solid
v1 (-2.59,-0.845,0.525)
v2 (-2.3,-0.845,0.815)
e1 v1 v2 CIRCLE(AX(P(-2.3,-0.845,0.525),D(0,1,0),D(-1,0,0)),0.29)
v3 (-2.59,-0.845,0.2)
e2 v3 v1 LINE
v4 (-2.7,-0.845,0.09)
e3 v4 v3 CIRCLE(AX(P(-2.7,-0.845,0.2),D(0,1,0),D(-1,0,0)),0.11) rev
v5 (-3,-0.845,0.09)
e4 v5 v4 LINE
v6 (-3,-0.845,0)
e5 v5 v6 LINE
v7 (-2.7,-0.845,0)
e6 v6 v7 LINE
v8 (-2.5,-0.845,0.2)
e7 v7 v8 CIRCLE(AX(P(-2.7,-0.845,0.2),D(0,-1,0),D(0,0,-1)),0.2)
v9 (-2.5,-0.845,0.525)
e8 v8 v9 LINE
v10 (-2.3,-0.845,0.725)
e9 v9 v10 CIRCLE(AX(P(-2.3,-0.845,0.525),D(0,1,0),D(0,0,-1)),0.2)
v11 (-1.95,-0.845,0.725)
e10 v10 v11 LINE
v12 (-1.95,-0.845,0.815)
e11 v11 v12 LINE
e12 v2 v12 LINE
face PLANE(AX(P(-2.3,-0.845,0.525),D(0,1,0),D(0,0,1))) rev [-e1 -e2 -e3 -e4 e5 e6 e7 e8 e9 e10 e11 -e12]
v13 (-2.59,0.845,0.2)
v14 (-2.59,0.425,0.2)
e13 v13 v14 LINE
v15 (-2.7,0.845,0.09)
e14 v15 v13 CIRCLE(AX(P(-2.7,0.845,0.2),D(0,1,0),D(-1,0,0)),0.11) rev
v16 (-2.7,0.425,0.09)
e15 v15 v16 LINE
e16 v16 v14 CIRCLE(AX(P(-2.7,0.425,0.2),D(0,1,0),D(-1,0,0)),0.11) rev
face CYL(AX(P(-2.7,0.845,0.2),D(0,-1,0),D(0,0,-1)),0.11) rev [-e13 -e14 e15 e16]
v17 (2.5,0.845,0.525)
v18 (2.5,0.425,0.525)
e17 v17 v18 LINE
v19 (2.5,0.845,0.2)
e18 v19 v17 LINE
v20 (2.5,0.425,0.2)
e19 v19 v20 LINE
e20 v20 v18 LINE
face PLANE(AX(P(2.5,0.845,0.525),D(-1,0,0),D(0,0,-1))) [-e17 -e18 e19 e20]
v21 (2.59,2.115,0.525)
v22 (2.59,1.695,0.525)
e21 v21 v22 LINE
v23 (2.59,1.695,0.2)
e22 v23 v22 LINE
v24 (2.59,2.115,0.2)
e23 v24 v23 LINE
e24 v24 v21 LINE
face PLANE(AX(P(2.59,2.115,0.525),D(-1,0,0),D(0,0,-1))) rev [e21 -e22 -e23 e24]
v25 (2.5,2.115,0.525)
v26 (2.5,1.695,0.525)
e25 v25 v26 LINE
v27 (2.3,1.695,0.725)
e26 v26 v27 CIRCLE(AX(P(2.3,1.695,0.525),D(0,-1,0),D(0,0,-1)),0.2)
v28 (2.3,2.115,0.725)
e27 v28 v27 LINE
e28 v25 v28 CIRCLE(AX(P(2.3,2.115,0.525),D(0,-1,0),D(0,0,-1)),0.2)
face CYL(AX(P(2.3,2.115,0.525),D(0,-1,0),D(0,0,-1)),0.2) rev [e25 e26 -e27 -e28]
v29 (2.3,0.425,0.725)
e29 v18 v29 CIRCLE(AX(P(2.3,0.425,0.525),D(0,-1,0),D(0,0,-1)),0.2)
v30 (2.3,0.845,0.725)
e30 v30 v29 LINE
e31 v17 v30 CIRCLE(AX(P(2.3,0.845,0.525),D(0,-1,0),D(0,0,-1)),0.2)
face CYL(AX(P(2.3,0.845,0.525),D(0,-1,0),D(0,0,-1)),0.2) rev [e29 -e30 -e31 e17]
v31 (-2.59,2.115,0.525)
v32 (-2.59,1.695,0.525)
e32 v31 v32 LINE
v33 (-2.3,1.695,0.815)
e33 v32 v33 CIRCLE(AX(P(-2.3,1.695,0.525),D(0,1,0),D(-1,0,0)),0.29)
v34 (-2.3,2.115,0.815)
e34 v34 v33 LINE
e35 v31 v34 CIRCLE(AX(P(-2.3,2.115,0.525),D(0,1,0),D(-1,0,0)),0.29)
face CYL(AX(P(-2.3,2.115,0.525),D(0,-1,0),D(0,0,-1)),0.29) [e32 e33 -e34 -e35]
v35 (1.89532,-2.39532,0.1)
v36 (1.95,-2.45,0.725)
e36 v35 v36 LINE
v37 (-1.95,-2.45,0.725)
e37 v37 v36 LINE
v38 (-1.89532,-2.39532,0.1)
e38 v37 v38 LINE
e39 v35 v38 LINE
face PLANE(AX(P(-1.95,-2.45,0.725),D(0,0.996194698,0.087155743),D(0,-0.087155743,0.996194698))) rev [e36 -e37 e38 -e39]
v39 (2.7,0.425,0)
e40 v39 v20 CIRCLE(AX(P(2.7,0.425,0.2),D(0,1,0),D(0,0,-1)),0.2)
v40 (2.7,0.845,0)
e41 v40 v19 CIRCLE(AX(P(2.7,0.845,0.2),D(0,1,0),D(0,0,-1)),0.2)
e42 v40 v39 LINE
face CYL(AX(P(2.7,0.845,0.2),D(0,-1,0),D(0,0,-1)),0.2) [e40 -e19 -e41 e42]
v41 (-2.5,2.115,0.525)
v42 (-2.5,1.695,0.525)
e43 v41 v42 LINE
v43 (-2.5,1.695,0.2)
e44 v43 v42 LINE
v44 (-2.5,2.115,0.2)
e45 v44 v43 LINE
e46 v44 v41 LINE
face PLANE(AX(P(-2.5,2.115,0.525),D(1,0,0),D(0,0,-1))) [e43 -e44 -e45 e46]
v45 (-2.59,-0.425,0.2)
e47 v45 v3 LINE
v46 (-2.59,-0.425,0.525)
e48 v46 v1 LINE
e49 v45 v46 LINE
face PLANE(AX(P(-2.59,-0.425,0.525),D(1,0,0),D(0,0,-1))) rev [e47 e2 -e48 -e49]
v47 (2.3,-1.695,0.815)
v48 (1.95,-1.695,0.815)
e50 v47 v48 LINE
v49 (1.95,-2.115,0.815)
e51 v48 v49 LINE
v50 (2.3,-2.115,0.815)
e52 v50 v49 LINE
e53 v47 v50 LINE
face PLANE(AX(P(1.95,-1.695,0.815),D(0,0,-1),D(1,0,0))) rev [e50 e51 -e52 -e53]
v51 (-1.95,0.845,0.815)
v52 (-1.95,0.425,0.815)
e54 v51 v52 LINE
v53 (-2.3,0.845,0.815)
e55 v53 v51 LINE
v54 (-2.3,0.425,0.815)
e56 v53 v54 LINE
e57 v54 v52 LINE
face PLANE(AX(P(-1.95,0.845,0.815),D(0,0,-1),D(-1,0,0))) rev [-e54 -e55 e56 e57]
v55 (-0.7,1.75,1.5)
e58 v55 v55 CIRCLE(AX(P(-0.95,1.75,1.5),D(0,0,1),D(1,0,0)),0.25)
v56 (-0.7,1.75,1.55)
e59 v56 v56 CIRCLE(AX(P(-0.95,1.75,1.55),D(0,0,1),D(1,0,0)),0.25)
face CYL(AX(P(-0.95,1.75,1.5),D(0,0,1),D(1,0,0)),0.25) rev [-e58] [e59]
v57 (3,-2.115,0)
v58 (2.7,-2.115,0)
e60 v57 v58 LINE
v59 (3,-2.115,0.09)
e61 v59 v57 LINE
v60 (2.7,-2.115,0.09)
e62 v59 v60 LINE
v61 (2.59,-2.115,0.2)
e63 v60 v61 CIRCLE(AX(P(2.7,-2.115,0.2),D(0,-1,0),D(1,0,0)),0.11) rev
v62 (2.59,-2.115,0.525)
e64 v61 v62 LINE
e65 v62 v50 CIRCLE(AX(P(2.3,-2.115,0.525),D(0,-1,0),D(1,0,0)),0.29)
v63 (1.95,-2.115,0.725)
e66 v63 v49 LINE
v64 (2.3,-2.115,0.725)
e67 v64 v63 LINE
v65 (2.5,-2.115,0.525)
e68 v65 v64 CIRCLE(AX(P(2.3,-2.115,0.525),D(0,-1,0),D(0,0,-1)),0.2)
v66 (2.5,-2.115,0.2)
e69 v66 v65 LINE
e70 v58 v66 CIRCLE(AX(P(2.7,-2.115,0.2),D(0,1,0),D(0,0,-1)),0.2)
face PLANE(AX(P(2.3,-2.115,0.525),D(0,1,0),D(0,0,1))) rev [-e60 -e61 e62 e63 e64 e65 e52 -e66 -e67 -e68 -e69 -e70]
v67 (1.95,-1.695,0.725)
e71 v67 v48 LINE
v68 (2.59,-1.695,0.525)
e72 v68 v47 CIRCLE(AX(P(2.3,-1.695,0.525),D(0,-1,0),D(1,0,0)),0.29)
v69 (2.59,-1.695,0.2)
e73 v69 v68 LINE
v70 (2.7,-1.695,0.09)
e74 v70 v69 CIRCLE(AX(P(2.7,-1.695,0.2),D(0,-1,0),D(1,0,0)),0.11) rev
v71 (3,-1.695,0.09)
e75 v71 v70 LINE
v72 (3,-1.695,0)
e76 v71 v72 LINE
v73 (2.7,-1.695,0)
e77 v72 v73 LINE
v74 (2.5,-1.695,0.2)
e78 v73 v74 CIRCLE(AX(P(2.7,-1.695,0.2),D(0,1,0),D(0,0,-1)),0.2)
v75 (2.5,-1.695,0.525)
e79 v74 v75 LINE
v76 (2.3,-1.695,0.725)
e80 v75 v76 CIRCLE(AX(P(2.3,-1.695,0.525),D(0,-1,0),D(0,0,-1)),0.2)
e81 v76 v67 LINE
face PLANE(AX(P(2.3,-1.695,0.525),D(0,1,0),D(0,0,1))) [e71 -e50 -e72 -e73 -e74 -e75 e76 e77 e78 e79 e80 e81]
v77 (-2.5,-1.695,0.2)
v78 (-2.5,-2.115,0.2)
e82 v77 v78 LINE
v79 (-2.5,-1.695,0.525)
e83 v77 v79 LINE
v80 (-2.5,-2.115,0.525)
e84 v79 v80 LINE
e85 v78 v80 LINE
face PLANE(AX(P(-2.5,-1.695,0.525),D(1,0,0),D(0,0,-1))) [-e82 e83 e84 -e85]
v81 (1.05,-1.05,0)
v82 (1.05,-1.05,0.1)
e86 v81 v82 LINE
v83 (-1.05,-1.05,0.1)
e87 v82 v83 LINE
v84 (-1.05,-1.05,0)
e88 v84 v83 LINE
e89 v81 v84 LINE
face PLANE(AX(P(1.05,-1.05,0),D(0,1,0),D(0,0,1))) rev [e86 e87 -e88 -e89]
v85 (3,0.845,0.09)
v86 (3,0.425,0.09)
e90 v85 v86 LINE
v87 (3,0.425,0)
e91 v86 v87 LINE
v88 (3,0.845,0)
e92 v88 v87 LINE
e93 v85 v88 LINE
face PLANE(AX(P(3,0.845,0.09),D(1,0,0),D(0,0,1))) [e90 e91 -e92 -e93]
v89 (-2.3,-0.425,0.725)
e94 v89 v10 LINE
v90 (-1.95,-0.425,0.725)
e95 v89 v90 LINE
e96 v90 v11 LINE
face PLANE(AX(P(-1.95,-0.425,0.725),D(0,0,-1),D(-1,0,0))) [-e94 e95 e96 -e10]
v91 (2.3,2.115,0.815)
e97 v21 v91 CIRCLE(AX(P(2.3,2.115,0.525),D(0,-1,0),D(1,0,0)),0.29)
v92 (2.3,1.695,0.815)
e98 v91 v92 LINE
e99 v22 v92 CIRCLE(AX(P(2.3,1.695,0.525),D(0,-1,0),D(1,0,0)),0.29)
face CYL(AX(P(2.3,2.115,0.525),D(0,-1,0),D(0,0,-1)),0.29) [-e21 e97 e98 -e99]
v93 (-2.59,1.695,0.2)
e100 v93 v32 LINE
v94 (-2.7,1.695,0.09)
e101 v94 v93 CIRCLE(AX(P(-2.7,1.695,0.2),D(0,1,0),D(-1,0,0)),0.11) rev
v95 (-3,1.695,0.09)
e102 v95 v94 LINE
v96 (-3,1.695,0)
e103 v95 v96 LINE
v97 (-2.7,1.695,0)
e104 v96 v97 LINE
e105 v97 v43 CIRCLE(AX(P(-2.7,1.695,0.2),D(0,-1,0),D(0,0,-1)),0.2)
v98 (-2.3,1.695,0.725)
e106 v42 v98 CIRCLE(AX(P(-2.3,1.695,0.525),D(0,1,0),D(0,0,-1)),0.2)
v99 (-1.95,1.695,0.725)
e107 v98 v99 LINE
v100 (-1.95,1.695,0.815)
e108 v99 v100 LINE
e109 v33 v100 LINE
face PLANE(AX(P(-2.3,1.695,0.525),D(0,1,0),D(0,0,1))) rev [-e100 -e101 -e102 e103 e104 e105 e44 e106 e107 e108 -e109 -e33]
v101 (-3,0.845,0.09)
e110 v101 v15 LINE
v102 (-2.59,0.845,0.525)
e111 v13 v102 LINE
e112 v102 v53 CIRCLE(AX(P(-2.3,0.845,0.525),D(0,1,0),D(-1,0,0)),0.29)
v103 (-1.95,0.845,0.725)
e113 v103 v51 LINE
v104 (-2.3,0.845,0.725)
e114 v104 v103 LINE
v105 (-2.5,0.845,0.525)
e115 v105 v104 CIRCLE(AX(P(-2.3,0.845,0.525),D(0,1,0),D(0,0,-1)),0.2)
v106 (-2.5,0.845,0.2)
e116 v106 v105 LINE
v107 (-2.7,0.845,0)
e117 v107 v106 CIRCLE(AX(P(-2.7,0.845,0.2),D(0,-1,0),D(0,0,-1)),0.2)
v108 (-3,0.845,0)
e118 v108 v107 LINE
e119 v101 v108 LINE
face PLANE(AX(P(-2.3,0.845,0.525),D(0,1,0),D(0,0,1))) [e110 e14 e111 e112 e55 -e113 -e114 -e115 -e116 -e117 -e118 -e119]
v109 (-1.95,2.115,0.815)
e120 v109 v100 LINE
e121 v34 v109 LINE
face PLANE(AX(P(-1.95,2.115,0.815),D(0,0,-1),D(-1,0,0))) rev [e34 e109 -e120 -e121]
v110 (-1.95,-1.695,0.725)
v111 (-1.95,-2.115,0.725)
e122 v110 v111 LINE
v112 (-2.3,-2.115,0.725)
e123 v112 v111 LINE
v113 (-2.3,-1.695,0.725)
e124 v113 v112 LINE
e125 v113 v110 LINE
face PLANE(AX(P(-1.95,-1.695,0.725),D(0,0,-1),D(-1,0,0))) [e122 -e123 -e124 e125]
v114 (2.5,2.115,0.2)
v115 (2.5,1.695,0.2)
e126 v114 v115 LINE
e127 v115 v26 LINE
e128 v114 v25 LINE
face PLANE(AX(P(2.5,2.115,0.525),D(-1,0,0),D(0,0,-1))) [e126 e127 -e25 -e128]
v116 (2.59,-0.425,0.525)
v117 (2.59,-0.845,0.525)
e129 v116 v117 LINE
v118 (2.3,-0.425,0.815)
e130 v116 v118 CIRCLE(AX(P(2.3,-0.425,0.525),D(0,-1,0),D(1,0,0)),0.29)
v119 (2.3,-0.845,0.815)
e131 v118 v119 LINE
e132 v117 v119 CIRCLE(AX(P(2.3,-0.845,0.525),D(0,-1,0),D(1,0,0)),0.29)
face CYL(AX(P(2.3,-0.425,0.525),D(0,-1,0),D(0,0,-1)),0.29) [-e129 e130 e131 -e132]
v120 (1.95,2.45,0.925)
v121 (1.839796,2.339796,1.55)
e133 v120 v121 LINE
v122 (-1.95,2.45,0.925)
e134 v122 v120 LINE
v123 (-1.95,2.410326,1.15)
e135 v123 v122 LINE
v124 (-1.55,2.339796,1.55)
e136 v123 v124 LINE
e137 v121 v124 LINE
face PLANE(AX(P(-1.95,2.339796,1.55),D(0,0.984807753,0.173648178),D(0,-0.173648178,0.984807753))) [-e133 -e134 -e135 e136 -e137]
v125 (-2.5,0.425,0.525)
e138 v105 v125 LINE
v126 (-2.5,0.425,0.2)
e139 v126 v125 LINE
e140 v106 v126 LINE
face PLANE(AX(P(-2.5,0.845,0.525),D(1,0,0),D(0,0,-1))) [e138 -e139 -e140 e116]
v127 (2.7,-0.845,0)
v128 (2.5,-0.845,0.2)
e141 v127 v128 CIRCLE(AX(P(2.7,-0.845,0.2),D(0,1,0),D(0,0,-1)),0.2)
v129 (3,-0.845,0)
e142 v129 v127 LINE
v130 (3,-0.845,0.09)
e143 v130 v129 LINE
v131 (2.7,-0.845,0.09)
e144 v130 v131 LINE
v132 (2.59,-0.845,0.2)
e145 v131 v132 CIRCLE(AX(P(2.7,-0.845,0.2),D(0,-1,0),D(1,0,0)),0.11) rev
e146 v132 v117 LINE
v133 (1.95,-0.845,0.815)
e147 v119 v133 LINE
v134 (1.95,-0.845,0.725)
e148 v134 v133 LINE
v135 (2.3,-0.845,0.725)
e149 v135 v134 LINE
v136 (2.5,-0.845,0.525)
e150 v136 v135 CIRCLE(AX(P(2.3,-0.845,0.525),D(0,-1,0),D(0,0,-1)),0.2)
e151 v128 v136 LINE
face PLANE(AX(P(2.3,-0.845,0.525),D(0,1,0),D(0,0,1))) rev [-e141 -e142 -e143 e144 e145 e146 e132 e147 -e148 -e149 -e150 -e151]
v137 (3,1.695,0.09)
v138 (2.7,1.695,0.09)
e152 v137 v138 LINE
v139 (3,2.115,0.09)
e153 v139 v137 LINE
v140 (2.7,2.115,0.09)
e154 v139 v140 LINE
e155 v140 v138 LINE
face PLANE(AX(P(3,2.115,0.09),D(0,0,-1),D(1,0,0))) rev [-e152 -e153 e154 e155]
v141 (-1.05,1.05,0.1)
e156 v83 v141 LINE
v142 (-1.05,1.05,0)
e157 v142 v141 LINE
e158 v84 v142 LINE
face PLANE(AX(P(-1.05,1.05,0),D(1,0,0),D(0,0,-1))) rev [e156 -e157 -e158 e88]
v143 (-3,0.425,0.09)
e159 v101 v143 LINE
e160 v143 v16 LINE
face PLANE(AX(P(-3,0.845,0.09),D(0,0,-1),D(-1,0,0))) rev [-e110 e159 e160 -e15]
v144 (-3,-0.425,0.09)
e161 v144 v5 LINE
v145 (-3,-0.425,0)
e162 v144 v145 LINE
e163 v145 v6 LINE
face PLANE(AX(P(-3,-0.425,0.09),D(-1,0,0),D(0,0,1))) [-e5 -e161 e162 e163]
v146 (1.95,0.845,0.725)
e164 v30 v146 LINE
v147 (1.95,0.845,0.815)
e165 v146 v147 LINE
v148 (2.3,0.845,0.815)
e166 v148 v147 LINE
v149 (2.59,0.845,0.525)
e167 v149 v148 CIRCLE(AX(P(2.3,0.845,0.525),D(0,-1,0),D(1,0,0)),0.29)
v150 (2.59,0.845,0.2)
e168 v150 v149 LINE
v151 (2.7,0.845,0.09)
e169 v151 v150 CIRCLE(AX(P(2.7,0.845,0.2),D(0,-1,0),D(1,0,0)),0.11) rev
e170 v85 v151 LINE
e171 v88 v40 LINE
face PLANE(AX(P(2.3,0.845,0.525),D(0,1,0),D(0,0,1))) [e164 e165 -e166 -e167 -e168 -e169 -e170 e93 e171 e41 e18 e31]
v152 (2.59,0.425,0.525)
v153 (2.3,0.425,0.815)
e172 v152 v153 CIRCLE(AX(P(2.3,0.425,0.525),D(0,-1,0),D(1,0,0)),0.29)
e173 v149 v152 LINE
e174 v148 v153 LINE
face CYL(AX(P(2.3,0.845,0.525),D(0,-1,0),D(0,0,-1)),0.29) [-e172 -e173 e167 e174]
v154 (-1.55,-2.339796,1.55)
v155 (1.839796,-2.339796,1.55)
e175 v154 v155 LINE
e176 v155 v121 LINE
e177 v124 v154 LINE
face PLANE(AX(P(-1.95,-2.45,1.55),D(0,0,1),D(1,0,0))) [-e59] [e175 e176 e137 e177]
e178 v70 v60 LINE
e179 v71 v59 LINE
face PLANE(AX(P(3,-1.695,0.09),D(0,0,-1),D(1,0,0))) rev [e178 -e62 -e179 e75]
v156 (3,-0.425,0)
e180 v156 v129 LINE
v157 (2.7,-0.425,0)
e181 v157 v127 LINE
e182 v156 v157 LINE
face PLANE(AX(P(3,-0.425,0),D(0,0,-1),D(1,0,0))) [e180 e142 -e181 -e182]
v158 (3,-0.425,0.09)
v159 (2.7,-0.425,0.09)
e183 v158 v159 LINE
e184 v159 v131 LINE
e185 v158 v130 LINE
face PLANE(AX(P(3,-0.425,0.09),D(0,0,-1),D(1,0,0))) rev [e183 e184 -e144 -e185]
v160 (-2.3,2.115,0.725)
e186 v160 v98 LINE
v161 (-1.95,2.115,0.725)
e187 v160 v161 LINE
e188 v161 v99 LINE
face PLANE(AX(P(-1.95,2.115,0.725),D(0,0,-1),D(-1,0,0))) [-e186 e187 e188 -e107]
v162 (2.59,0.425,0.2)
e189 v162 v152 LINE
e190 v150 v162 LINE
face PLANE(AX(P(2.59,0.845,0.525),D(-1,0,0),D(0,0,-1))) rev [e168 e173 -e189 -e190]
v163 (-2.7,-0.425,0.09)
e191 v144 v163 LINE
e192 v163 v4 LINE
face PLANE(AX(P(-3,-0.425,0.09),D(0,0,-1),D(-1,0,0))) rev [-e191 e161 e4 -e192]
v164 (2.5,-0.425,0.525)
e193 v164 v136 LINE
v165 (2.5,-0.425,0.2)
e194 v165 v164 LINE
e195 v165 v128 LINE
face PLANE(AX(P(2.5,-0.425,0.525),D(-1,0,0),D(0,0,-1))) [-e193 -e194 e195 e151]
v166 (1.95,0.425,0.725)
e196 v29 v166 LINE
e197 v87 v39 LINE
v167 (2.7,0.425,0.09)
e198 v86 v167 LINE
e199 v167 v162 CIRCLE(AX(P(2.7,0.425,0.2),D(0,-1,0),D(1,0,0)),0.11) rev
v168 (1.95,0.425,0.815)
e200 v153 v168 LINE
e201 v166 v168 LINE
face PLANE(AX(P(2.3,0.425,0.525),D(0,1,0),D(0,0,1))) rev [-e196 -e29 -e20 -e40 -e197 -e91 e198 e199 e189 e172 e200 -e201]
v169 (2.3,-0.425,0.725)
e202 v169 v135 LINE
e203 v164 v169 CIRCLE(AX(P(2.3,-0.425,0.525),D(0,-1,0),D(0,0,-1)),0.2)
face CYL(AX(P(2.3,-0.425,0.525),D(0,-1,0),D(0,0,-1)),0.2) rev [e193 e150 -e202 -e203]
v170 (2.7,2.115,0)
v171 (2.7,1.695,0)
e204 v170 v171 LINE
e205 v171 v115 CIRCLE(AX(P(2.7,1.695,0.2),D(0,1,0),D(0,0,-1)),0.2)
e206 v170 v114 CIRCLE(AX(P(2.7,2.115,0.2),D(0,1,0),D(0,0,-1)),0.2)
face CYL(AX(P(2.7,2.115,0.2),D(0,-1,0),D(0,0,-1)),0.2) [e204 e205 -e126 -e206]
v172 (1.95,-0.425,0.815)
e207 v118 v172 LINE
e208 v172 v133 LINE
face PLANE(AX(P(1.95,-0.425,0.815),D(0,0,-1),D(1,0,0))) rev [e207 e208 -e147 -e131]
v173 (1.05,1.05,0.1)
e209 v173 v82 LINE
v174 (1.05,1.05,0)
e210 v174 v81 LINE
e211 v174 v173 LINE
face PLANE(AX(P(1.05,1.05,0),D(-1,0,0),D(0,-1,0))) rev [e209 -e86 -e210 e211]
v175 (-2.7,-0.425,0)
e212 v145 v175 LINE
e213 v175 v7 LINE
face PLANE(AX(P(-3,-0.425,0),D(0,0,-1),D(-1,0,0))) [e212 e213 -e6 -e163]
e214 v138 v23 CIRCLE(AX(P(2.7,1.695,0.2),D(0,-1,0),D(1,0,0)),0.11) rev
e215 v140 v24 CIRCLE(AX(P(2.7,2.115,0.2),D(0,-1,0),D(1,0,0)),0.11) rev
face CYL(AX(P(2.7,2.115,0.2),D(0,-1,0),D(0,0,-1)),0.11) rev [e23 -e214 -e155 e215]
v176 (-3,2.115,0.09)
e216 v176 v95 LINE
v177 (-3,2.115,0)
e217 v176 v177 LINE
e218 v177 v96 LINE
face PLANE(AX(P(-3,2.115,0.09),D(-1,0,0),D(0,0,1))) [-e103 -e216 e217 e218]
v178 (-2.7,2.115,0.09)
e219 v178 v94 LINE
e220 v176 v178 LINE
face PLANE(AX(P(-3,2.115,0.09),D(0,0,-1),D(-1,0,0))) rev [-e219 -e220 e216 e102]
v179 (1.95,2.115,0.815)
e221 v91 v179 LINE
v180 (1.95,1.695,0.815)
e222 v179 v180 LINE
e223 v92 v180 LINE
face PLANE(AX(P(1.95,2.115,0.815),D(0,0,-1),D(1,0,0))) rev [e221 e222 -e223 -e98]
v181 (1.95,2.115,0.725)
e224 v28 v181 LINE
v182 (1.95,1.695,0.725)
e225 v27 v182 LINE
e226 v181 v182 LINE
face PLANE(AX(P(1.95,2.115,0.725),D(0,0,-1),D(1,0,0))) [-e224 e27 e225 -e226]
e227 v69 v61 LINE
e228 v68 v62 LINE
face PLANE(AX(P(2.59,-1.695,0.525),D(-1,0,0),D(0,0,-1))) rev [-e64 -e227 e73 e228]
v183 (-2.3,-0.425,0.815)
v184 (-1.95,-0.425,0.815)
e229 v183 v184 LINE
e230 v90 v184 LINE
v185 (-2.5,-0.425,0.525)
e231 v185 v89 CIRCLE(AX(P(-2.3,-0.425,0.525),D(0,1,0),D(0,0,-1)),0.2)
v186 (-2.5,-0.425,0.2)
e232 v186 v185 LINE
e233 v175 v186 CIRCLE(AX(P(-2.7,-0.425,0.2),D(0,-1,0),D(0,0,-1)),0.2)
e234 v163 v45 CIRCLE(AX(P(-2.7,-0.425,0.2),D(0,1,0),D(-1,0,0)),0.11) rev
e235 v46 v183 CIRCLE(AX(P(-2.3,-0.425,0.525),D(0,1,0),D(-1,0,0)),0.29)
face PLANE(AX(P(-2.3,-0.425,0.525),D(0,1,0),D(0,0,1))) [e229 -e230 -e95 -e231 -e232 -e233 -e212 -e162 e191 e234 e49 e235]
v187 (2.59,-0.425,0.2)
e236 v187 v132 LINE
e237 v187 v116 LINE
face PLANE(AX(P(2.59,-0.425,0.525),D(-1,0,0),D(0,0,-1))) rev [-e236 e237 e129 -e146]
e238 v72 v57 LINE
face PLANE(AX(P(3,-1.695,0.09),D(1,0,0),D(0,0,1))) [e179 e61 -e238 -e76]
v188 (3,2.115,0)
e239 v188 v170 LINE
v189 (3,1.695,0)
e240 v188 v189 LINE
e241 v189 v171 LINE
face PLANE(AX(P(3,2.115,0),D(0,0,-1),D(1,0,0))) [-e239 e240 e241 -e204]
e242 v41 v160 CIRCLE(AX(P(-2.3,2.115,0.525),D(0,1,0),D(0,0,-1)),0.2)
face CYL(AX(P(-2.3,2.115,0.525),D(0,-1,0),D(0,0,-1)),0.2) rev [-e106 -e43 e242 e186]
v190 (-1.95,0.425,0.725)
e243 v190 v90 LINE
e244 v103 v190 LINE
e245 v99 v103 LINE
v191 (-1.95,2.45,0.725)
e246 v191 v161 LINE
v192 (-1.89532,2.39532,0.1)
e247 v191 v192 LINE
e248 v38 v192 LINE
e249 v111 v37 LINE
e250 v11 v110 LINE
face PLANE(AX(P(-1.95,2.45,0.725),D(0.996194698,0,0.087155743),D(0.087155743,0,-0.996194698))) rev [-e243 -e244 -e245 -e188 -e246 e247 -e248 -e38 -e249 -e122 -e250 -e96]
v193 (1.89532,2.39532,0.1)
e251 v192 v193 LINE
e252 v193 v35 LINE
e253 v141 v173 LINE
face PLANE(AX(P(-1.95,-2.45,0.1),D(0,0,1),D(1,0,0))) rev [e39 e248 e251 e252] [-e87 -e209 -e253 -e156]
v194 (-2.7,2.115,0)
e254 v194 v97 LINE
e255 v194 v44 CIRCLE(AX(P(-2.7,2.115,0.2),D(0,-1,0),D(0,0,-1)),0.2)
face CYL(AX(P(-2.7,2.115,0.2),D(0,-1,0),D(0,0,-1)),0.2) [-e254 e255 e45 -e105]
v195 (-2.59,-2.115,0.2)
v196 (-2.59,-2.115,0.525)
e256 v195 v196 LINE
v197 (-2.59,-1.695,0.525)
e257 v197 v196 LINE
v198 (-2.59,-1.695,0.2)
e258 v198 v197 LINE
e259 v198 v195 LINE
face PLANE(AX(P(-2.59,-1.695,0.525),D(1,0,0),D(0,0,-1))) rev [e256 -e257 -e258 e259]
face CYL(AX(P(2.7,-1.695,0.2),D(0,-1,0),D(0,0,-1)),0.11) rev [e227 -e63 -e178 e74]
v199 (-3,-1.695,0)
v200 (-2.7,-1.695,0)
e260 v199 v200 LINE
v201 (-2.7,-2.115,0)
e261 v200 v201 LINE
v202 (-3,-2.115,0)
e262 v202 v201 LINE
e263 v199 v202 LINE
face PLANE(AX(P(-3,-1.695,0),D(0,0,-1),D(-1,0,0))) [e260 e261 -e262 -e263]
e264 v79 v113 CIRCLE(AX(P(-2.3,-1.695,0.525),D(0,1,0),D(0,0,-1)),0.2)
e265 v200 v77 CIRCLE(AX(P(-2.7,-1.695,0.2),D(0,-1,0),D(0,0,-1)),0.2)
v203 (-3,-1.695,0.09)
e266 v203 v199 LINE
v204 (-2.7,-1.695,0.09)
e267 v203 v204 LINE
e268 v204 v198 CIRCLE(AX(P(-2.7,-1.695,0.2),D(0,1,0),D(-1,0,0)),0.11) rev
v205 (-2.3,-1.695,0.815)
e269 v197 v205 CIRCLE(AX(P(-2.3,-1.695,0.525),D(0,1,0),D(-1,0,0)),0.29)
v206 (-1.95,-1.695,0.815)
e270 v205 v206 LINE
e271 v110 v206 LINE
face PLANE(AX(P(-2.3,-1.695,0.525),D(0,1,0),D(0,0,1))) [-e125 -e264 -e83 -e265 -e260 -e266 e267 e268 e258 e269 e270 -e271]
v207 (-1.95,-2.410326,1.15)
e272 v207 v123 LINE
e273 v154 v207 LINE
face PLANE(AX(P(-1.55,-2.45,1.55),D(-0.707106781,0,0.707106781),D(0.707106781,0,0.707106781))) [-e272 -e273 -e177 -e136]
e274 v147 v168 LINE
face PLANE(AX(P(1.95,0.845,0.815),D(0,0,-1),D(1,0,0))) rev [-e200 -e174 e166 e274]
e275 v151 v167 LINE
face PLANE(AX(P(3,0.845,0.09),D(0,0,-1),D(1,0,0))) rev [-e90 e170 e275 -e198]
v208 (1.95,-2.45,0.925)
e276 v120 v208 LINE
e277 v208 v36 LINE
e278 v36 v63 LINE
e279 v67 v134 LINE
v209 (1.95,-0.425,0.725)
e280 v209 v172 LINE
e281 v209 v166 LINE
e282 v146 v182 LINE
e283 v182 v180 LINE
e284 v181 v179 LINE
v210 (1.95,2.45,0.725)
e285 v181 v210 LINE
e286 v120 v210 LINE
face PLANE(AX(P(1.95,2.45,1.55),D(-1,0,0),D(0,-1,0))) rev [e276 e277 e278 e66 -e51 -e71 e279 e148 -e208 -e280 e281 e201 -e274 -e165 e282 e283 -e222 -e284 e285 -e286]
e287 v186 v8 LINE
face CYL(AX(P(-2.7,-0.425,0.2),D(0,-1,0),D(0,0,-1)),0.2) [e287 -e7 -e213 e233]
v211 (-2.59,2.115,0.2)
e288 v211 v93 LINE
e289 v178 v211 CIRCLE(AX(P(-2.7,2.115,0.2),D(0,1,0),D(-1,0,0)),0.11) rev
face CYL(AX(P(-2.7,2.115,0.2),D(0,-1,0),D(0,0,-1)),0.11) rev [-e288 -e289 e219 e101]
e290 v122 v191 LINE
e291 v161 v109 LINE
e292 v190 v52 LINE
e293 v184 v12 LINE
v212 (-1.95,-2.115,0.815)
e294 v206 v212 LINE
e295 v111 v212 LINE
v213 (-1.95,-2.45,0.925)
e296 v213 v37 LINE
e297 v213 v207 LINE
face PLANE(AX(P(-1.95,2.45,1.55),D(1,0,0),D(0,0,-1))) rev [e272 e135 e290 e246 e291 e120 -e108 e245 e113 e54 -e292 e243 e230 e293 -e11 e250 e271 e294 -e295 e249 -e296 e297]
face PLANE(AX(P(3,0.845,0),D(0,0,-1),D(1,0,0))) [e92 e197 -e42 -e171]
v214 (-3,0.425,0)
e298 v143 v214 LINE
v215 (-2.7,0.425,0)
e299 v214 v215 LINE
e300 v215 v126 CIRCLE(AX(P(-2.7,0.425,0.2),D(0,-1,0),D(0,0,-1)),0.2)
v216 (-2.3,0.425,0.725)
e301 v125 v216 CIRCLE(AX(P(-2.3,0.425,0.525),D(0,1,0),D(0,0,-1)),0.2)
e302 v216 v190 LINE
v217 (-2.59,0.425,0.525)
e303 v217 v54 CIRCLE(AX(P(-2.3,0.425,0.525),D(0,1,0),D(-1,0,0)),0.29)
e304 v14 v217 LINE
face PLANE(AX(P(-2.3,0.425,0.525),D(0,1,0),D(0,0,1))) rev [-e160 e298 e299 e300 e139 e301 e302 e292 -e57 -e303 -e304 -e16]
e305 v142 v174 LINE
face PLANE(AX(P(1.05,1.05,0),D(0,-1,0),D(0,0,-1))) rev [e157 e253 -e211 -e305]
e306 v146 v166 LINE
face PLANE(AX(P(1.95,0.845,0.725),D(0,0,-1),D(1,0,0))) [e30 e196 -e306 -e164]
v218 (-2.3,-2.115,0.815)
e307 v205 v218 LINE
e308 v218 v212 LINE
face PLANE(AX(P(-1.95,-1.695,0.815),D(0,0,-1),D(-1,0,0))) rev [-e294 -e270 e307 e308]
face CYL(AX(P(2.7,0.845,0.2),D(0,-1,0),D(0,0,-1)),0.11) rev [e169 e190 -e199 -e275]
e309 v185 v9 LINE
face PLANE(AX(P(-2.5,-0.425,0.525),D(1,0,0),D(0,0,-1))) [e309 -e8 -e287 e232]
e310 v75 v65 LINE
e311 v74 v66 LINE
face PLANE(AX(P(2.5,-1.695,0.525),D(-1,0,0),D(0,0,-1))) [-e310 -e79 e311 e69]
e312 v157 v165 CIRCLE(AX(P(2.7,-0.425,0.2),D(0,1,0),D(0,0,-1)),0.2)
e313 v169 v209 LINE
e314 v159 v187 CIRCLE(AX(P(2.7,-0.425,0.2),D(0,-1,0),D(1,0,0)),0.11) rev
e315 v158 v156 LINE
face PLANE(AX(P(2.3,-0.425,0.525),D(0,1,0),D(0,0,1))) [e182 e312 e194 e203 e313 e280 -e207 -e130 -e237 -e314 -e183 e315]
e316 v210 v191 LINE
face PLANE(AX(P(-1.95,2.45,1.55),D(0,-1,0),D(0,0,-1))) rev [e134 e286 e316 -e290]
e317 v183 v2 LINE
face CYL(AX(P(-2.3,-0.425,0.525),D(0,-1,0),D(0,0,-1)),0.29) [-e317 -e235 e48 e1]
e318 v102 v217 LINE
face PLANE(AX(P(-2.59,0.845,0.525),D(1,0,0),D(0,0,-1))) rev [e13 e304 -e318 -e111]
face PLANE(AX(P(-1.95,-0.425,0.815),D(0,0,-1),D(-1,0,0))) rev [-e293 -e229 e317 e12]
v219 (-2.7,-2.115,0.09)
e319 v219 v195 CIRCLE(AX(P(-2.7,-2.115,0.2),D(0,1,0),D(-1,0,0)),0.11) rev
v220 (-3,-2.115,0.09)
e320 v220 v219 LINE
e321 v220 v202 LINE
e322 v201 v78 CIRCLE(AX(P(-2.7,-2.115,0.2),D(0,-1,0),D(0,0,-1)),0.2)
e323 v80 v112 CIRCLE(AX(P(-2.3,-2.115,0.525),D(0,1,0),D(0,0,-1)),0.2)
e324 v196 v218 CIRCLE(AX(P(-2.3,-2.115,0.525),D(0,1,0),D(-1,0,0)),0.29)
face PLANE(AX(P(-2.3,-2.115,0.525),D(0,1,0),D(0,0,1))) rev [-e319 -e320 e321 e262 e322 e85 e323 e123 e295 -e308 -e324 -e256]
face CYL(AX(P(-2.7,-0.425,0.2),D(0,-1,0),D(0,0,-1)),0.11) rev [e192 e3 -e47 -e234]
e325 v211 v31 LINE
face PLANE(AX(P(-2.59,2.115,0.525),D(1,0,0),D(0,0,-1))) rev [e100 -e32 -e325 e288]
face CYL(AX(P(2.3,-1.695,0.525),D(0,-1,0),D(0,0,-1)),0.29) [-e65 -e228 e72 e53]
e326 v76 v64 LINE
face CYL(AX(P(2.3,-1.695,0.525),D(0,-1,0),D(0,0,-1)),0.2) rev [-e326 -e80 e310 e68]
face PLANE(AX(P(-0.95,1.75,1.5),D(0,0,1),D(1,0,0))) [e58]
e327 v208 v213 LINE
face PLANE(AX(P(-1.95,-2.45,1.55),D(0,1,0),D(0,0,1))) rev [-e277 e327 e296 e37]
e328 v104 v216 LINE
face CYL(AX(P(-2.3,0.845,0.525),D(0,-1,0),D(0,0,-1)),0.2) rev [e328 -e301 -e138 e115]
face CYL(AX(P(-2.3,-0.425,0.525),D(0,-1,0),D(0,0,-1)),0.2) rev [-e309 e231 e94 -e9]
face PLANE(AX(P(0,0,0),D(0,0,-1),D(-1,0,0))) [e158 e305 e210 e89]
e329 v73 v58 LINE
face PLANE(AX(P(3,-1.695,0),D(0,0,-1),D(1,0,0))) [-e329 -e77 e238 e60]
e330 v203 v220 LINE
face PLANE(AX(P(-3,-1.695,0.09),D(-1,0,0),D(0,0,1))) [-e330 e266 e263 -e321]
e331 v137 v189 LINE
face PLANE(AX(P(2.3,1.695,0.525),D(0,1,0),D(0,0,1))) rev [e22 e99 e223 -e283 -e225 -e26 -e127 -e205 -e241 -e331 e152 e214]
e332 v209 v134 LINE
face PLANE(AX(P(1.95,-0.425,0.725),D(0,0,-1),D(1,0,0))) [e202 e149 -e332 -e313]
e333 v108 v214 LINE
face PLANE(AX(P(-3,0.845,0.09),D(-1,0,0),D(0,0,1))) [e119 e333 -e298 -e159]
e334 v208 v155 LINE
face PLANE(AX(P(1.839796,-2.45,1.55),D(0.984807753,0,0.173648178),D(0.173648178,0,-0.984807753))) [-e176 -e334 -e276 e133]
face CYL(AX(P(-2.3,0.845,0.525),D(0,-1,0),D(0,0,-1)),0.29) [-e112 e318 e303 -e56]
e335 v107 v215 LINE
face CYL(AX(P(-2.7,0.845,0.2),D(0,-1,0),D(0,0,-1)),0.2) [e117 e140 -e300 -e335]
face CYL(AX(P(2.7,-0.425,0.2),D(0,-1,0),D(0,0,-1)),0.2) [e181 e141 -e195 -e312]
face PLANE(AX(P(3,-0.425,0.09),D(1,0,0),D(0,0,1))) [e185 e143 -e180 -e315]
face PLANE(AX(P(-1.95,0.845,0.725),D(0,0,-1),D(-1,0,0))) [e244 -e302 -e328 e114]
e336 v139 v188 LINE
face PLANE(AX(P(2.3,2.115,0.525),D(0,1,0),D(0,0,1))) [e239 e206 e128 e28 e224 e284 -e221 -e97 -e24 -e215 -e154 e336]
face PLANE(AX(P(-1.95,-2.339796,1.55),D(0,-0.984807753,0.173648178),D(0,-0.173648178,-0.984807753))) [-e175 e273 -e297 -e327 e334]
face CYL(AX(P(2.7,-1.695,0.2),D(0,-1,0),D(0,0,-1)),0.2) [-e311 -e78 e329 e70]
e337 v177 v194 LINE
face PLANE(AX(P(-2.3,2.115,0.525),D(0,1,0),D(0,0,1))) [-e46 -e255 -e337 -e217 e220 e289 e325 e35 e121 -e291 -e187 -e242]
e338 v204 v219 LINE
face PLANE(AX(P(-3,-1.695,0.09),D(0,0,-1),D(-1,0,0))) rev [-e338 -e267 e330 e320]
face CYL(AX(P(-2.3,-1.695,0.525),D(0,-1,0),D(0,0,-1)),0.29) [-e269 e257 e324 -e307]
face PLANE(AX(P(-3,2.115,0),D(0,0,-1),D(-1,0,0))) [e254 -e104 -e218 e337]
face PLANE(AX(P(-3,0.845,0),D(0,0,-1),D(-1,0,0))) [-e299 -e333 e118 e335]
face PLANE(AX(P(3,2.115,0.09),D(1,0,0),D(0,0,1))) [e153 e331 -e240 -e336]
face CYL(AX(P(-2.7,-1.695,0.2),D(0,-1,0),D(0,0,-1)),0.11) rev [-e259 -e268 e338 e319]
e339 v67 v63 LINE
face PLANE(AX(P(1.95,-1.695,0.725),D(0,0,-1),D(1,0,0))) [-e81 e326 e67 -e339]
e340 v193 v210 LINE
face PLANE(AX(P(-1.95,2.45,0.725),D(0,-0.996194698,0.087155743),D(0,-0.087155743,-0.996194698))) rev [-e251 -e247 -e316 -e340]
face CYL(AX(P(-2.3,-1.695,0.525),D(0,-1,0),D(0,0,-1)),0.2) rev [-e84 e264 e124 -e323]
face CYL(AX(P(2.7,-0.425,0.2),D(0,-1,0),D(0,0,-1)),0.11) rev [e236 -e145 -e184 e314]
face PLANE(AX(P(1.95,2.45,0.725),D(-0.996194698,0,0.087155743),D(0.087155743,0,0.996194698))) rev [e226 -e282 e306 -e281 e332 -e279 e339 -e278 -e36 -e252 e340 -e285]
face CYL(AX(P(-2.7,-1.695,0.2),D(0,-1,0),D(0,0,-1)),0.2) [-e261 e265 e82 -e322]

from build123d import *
from OCP.BRepFilletAPI import BRepFilletAPI_MakeChamfer

# Parameters (mm, degrees)
ESQUISSE2_W              = 3.9
ESQUISSE2_H              = 4.9
CORP_DEPTH               = 1.45
PIN_1_DEPTH              = 0.21
R_P_TITION_PIN_1_4_COUNT = 4
R_P_TITION_PIN_1_4_PITCH = 1.27
SYM_TRIE1_COPY_1_DEPTH   = 0.21
SYM_TRIE1_COPY_2_DEPTH   = 0.21
SYM_TRIE1_COPY_3_DEPTH   = 0.21
CHANFREIN4_SIZE          = 0.625
CHANFREIN4_SIZE2         = 0.110204363
CHANFREIN5_SIZE          = 0.625
CHANFREIN5_SIZE_2        = 0.054680415
ESQUISSE8_R              = 0.25
ENL_V_MAT_EXTRU_1_DEPTH  = 0.05
CHANFREIN7_SIZE          = 0.4
ESQUISSE9_W              = 2.1
ESQUISSE9_H              = 2.1
EXPOSED_PAD_DEPTH        = 0.1


with BuildPart() as part:
    # Esquisse2 → corp (new body)
    with BuildSketch(Plane.XY.offset(0.1)):
        Rectangle(ESQUISSE2_W, ESQUISSE2_H)
    extrude(amount=CORP_DEPTH)

    # Esquisse6 → pin 1 (add, symmetric)
    with BuildSketch(Plane(origin=(0, 1.905, 0), x_dir=(-1, 0, 0), z_dir=(0, 1, 0))):
        with BuildLine():
            Line((1.95, 0.725), (2.3, 0.725))
            ThreePointArc((2.3, 0.725), (2.441421356, 0.666421356), (2.5, 0.525))
            Line((2.5, 0.525), (2.5, 0.2))
            ThreePointArc((2.5, 0.2), (2.558578644, 0.058578644), (2.7, 0))
            Line((2.7, 0), (3, 0))
            Line((3, 0), (3, 0.09))
            Line((3, 0.09), (2.7, 0.09))
            ThreePointArc((2.7, 0.09), (2.622218254, 0.122218254), (2.59, 0.2))
            Line((2.59, 0.2), (2.59, 0.525))
            ThreePointArc((2.59, 0.525), (2.505060967, 0.730060967), (2.3, 0.815))
            Line((2.3, 0.815), (1.95, 0.815))
            Line((1.95, 0.815), (1.95, 0.725))
        make_face()
    pin_1 = extrude(amount=PIN_1_DEPTH, both=True)

    # Répétition pin 1-4: pin 1 ×4
    with Locations(*[(0, -i * R_P_TITION_PIN_1_4_PITCH, 0) for i in range(1, R_P_TITION_PIN_1_4_COUNT)]):
        add(pin_1)

    # Symétrie1: pin 1 across plane
    add(pin_1.mirror(Plane(origin=(0, 0, 0), x_dir=(0, 0, 1), z_dir=(1, 0, 0))))

    # Symétrie1 copy 1 sketch → Symétrie1 copy 1 (add, symmetric)
    with BuildSketch(Plane(origin=(0, 0.635, 0), x_dir=(1, 0, 0), z_dir=(0, 1, 0))):
        with BuildLine():
            Line((1.95, -0.725), (2.3, -0.725))
            ThreePointArc((2.3, -0.725), (2.441421356, -0.666421356), (2.5, -0.525))
            Line((2.5, -0.525), (2.5, -0.2))
            ThreePointArc((2.5, -0.2), (2.558578644, -0.058578644), (2.7, 0))
            Line((2.7, 0), (3, 0))
            Line((3, 0), (3, -0.09))
            Line((3, -0.09), (2.7, -0.09))
            ThreePointArc((2.7, -0.09), (2.622218254, -0.122218254), (2.59, -0.2))
            Line((2.59, -0.2), (2.59, -0.525))
            ThreePointArc((2.59, -0.525), (2.505060967, -0.730060967), (2.3, -0.815))
            Line((2.3, -0.815), (1.95, -0.815))
            Line((1.95, -0.815), (1.95, -0.725))
        make_face()
    extrude(amount=SYM_TRIE1_COPY_1_DEPTH, both=True)

    # Symétrie1 copy 2 sketch → Symétrie1 copy 2 (add, symmetric)
    with BuildSketch(Plane(origin=(0, -0.635, 0), x_dir=(1, 0, 0), z_dir=(0, 1, 0))):
        with BuildLine():
            Line((1.95, -0.725), (2.3, -0.725))
            ThreePointArc((2.3, -0.725), (2.441421356, -0.666421356), (2.5, -0.525))
            Line((2.5, -0.525), (2.5, -0.2))
            ThreePointArc((2.5, -0.2), (2.558578644, -0.058578644), (2.7, 0))
            Line((2.7, 0), (3, 0))
            Line((3, 0), (3, -0.09))
            Line((3, -0.09), (2.7, -0.09))
            ThreePointArc((2.7, -0.09), (2.622218254, -0.122218254), (2.59, -0.2))
            Line((2.59, -0.2), (2.59, -0.525))
            ThreePointArc((2.59, -0.525), (2.505060967, -0.730060967), (2.3, -0.815))
            Line((2.3, -0.815), (1.95, -0.815))
            Line((1.95, -0.815), (1.95, -0.725))
        make_face()
    extrude(amount=SYM_TRIE1_COPY_2_DEPTH, both=True)

    # Symétrie1 copy 3 sketch → Symétrie1 copy 3 (add, symmetric)
    with BuildSketch(Plane(origin=(0, -1.905, 0), x_dir=(1, 0, 0), z_dir=(0, 1, 0))):
        with BuildLine():
            Line((1.95, -0.725), (2.3, -0.725))
            ThreePointArc((2.3, -0.725), (2.441421356, -0.666421356), (2.5, -0.525))
            Line((2.5, -0.525), (2.5, -0.2))
            ThreePointArc((2.5, -0.2), (2.558578644, -0.058578644), (2.7, 0))
            Line((2.7, 0), (3, 0))
            Line((3, 0), (3, -0.09))
            Line((3, -0.09), (2.7, -0.09))
            ThreePointArc((2.7, -0.09), (2.622218254, -0.122218254), (2.59, -0.2))
            Line((2.59, -0.2), (2.59, -0.525))
            ThreePointArc((2.59, -0.525), (2.505060967, -0.730060967), (2.3, -0.815))
            Line((2.3, -0.815), (1.95, -0.815))
            Line((1.95, -0.815), (1.95, -0.725))
        make_face()
    extrude(amount=SYM_TRIE1_COPY_3_DEPTH, both=True)

    # Chanfrein4: one chamfer whose edges measure the first distance from different faces: ONE call of the kernel's chamfer builder (chamfer() names one face for all edges)
    chanfrein4_edges_1 = [part.edges().sort_by_distance(p)[0] for p in [
        (1.95, 0, 1.55),
    ]]
    chanfrein4_side_1 = [part.faces().sort_by_distance(p)[0] for p in [
        (1.95, 0, 0.826195893),
    ]]
    chanfrein4_edges_2 = [part.edges().sort_by_distance(p)[0] for p in [
        (0, 2.45, 1.55),
    ]]
    chanfrein4_side_2 = [part.faces().sort_by_distance(p)[0] for p in [
        (0, 2.45, 0.825),
    ]]
    chanfrein4_edges_3 = [part.edges().sort_by_distance(p)[0] for p in [
        (0, -2.45, 1.55),
    ]]
    chanfrein4_side_3 = [part.faces().sort_by_distance(p)[0] for p in [
        (0, -2.45, 0.825),
    ]]
    chanfrein4 = BRepFilletAPI_MakeChamfer(part.part.solid().wrapped)
    for e in chanfrein4_edges_1:
        chanfrein4.Add(CHANFREIN4_SIZE, CHANFREIN4_SIZE2, e.wrapped, chanfrein4_side_1[0].wrapped)  # the first distance lies on this face
    for e in chanfrein4_edges_2:
        chanfrein4.Add(CHANFREIN4_SIZE, CHANFREIN4_SIZE2, e.wrapped, chanfrein4_side_2[0].wrapped)  # the first distance lies on this face
    for e in chanfrein4_edges_3:
        chanfrein4.Add(CHANFREIN4_SIZE, CHANFREIN4_SIZE2, e.wrapped, chanfrein4_side_3[0].wrapped)  # the first distance lies on this face
    add(Compound.cast(chanfrein4.Shape()), mode=Mode.REPLACE)

    # Chanfrein5
    chanfrein5_edges_1 = [part.edges().sort_by_distance(p)[0] for p in [
        (0, 2.45, 0.1),
    ]]
    chanfrein5_side_1 = [part.faces().sort_by_distance(p)[0] for p in [
        (0, 2.45, 0.101093608),
    ]]
    chanfrein5_edges_2 = [part.edges().sort_by_distance(p)[0] for p in [
        (1.95, 0, 0.1),
    ]]
    chanfrein5_side_2 = [part.faces().sort_by_distance(p)[0] for p in [
        (1.948906392, 0, 0.1),
    ]]
    chanfrein5_edges_3 = [part.edges().sort_by_distance(p)[0] for p in [
        (0, -2.45, 0.1),
    ]]
    chanfrein5_side_3 = [part.faces().sort_by_distance(p)[0] for p in [
        (0, -2.448906392, 0.1),
    ]]
    chanfrein5_edges_4 = [part.edges().sort_by_distance(p)[0] for p in [
        (-1.95, 0, 0.1),
    ]]
    chanfrein5_side_4 = [part.faces().sort_by_distance(p)[0] for p in [
        (-1.95, 0, 0.101093608),
    ]]
    chanfrein5 = BRepFilletAPI_MakeChamfer(part.part.solid().wrapped)
    for e in chanfrein5_edges_1:
        chanfrein5.Add(CHANFREIN5_SIZE - 0.0001, CHANFREIN5_SIZE_2 - 0.0001, e.wrapped, chanfrein5_side_1[0].wrapped)
    for e in chanfrein5_edges_2:
        chanfrein5.Add(CHANFREIN5_SIZE_2 - 0.0001, CHANFREIN5_SIZE - 0.0001, e.wrapped, chanfrein5_side_2[0].wrapped)
    for e in chanfrein5_edges_3:
        chanfrein5.Add(CHANFREIN5_SIZE_2 - 0.0001, CHANFREIN5_SIZE - 0.0001, e.wrapped, chanfrein5_side_3[0].wrapped)
    for e in chanfrein5_edges_4:
        chanfrein5.Add(CHANFREIN5_SIZE - 0.0001, CHANFREIN5_SIZE_2 - 0.0001, e.wrapped, chanfrein5_side_4[0].wrapped)
    add(Compound.cast(chanfrein5.Shape()), mode=Mode.REPLACE)  # a hair under: the kernel refuses the full size

    # Esquisse8 → Enlèv. mat.-Extru.1 (cut)
    with BuildSketch(Plane.XY.offset(1.55)):
        with Locations((-0.95, 1.75)):
            Circle(ESQUISSE8_R)
    extrude(amount=-ENL_V_MAT_EXTRU_1_DEPTH, mode=Mode.SUBTRACT)

    # Chanfrein7
    chanfrein7_edges = [part.edges().sort_by_distance(p)[0] for p in [
        (-1.95, 0, 1.55),
    ]]
    chamfer(chanfrein7_edges, length=CHANFREIN7_SIZE)

    # Esquisse9 → exposed pad (add)
    with BuildSketch(Plane(origin=(0, 0, 0.1), x_dir=(-1, 0, 0), z_dir=(0, 0, -1))):
        Rectangle(ESQUISSE9_W, ESQUISSE9_H)
    extrude(amount=EXPOSED_PAD_DEPTH)


solid = part.part
